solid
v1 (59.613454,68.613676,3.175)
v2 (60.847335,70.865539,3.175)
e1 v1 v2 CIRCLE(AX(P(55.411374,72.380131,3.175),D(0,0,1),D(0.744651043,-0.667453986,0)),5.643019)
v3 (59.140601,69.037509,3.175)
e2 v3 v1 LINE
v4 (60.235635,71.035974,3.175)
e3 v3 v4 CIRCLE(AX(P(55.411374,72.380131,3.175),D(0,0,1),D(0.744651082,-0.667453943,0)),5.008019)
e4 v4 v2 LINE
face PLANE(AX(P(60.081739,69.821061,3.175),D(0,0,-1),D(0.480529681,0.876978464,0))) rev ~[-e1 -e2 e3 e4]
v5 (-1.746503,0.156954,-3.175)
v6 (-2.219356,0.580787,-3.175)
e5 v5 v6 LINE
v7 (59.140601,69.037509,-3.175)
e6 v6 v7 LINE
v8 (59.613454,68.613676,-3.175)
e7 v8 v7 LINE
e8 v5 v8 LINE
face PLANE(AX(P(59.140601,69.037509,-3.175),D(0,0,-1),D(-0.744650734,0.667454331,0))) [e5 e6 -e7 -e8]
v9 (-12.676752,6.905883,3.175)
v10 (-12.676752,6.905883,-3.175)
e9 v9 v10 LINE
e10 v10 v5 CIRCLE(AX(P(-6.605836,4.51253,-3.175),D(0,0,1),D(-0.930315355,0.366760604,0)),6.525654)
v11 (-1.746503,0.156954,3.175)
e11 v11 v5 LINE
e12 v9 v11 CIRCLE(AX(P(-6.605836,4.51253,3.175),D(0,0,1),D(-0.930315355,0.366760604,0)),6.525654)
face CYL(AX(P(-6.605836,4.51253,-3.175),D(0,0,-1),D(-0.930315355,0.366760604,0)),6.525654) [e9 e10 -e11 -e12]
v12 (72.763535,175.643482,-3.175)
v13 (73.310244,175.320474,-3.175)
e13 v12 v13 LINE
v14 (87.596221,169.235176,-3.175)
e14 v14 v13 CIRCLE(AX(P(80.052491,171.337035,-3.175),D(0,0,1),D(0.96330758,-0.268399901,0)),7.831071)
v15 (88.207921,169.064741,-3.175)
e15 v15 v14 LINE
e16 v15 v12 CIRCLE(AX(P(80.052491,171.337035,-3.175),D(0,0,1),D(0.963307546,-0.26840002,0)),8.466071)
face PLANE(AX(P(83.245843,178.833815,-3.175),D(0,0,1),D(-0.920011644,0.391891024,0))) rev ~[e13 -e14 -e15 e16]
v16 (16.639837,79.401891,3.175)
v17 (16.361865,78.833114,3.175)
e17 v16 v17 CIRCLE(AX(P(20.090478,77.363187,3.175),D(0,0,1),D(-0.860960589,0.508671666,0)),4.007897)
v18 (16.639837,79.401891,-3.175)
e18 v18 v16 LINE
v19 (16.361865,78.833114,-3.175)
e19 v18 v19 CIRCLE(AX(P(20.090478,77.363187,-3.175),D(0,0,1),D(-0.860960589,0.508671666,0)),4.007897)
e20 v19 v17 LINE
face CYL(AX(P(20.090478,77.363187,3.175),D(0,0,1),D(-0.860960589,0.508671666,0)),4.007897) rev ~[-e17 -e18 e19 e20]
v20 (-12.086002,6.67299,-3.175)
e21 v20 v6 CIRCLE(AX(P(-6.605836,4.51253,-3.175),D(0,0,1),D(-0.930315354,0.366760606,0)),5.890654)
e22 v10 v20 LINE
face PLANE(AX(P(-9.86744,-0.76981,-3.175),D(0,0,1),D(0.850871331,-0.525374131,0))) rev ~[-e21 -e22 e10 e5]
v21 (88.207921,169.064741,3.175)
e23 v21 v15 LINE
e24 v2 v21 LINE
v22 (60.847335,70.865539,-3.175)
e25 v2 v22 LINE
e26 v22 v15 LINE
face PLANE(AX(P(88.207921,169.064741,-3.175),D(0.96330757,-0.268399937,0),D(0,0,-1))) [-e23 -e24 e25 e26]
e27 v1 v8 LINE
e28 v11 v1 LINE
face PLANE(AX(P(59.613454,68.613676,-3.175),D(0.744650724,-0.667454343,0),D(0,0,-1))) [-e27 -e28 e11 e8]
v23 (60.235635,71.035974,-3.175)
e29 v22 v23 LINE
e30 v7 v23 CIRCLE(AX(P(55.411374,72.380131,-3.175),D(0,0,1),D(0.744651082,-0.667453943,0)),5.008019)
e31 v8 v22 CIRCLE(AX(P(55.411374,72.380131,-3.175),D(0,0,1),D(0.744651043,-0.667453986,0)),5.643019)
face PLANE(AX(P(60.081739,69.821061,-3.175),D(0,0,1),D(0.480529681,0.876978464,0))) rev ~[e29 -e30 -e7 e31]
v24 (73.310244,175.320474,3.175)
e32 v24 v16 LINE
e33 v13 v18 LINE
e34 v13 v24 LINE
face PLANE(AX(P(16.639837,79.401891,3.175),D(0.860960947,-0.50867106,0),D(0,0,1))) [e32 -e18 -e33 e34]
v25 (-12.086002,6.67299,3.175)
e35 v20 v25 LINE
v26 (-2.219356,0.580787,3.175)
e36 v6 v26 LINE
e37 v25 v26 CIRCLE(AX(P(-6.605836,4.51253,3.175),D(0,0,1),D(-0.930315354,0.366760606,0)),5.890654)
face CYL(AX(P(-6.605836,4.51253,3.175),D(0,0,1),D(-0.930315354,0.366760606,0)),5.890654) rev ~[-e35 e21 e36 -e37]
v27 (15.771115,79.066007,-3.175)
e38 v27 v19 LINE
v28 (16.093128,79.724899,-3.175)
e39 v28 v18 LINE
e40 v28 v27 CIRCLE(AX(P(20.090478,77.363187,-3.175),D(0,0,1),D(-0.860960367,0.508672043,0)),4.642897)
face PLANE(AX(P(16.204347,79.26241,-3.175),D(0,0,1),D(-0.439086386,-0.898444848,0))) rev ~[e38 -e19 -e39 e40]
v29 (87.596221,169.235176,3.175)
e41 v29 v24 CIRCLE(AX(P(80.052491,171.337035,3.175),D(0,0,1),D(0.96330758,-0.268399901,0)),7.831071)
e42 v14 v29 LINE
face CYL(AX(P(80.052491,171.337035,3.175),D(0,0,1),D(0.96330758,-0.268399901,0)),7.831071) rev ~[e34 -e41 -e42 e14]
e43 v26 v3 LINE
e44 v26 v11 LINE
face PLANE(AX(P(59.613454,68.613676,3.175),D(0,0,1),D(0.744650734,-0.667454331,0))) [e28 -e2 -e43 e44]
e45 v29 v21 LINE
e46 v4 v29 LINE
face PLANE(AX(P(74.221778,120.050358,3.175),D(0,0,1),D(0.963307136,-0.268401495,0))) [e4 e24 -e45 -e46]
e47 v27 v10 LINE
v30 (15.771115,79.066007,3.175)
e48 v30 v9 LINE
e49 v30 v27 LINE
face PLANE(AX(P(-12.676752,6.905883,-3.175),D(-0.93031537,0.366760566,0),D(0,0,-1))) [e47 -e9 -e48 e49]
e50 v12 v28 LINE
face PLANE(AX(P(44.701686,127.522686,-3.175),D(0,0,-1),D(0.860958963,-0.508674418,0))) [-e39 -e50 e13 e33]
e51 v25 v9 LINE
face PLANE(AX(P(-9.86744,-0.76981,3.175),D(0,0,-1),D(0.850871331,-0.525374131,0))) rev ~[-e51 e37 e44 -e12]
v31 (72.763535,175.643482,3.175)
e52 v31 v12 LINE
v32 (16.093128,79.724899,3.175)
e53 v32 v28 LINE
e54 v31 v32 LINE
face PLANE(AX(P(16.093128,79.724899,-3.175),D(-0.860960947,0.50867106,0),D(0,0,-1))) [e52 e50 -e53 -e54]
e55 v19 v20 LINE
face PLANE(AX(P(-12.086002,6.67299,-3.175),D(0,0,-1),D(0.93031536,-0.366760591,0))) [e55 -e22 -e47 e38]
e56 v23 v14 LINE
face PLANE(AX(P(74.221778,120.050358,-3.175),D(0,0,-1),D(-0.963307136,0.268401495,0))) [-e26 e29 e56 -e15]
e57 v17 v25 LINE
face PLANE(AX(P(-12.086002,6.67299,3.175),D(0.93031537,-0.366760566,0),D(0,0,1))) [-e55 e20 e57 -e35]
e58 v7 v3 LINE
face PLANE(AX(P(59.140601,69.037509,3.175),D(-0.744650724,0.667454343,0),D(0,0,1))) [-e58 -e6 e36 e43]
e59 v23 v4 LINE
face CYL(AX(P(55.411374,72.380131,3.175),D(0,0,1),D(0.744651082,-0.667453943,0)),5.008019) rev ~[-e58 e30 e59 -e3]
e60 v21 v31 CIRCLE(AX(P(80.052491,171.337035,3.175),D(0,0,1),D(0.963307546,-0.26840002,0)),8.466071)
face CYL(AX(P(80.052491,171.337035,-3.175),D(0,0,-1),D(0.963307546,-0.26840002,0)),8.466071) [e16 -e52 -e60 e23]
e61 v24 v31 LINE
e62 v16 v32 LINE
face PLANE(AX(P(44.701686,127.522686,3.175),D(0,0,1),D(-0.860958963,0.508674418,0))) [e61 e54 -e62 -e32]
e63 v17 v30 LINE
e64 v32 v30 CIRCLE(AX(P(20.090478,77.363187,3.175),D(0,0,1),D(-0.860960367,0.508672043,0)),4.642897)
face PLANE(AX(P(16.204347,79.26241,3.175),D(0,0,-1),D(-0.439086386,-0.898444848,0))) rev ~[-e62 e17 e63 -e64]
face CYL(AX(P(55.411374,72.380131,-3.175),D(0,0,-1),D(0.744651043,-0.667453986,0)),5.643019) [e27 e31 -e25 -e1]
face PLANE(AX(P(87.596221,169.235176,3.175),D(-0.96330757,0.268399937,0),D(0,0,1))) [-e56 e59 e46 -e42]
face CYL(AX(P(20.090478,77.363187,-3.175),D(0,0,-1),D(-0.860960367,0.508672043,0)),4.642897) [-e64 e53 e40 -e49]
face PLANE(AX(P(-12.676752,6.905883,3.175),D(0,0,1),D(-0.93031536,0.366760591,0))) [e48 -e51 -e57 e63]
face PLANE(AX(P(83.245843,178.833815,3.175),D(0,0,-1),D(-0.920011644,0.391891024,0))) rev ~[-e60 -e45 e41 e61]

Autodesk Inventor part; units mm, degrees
sketch "Эскизная траектория" plane through (0, 0, 0) normal (0, 0, 1) x (1, 0, 0)
  arc A0 (-12.322302, 6.766147) -> (-2.030215, 0.411254) centre (-6.605836, 4.51253) ccw
  arc A1 (16.421153, 79.531094) -> (16.125565, 78.926271) centre (20.090569, 77.363138) ccw
  arc A2 (87.840901, 169.167002) -> (73.09156, 175.449677) centre (80.052491, 171.337035) ccw
  arc A3 (59.329742, 68.867976) -> (60.480315, 70.9678) centre (55.41139, 72.38012) ccw
  line L0 (59.329742, 68.867976) -> (-2.030215, 0.411254)
  line L1 (-12.322302, 6.766147) -> (16.125565, 78.926271)
  line L2 (16.421153, 79.531094) -> (73.09156, 175.449677)
  line L3 (87.840901, 169.167002) -> (60.480315, 70.9678)
ref_plane "Плоскость сечения" through (-2.030215, 0.411254, 0) normal (0.6674543, 0.7446507, 0) x (0, 0, 1)
ref_plane "РабПлоскость2" through (-6.605836, 4.51253, 0) normal (-1, 0, 0) x (0, 0, 1)
ref_plane "РабПлоскость3" through (80.052491, 171.337035, 0) normal (-0.53125, -0.8472151, 0) x (0, 0, 1)
sketch "Сечение" plane through (-2.030215, 0.411254, 0) normal (0.6674543, 0.7446507, 0) x (0, 0, 1)
  line L0 (-3.175, 0.381) -> (3.175, 0.381)
  line L1 (3.175, 0.381) -> (3.175, -0.254)
  line L2 (3.175, -0.254) -> (-3.175, -0.254)
  line L3 (-3.175, -0.254) -> (-3.175, 0.381)
  line L4 (-3.175, 0) -> (3.175, 0) construction
  point P0 (0, 0)
  point P1 (0, 0)
  dimension "d0" = 6.35
  dimension "d4" = 0.254
  dimension "d5" = 0.381
sweep "Ремень" add profiles "Сечение" path "Эскизная траектория"
equation "\"d0\" = da_B"
equation "\"d4\" = da_a"
equation "\"d5\" = da_a2"
equation "\"da_B\" = 6.35"
equation "\"da_pb\" = 2.032"
equation "\"da_L\" = 426.33783"
equation "\"da_a\" = 0.254"
equation "\"da_S\" = 1.143"
equation "\"da_Beta\" = 20deg"
equation "\"da_Ht\" = 0.508"
equation "\"da_H\" = 1.143"
equation "\"da_a2\" = 0.381"
properties part number "Зубчатый ремень" material "Rubber"
